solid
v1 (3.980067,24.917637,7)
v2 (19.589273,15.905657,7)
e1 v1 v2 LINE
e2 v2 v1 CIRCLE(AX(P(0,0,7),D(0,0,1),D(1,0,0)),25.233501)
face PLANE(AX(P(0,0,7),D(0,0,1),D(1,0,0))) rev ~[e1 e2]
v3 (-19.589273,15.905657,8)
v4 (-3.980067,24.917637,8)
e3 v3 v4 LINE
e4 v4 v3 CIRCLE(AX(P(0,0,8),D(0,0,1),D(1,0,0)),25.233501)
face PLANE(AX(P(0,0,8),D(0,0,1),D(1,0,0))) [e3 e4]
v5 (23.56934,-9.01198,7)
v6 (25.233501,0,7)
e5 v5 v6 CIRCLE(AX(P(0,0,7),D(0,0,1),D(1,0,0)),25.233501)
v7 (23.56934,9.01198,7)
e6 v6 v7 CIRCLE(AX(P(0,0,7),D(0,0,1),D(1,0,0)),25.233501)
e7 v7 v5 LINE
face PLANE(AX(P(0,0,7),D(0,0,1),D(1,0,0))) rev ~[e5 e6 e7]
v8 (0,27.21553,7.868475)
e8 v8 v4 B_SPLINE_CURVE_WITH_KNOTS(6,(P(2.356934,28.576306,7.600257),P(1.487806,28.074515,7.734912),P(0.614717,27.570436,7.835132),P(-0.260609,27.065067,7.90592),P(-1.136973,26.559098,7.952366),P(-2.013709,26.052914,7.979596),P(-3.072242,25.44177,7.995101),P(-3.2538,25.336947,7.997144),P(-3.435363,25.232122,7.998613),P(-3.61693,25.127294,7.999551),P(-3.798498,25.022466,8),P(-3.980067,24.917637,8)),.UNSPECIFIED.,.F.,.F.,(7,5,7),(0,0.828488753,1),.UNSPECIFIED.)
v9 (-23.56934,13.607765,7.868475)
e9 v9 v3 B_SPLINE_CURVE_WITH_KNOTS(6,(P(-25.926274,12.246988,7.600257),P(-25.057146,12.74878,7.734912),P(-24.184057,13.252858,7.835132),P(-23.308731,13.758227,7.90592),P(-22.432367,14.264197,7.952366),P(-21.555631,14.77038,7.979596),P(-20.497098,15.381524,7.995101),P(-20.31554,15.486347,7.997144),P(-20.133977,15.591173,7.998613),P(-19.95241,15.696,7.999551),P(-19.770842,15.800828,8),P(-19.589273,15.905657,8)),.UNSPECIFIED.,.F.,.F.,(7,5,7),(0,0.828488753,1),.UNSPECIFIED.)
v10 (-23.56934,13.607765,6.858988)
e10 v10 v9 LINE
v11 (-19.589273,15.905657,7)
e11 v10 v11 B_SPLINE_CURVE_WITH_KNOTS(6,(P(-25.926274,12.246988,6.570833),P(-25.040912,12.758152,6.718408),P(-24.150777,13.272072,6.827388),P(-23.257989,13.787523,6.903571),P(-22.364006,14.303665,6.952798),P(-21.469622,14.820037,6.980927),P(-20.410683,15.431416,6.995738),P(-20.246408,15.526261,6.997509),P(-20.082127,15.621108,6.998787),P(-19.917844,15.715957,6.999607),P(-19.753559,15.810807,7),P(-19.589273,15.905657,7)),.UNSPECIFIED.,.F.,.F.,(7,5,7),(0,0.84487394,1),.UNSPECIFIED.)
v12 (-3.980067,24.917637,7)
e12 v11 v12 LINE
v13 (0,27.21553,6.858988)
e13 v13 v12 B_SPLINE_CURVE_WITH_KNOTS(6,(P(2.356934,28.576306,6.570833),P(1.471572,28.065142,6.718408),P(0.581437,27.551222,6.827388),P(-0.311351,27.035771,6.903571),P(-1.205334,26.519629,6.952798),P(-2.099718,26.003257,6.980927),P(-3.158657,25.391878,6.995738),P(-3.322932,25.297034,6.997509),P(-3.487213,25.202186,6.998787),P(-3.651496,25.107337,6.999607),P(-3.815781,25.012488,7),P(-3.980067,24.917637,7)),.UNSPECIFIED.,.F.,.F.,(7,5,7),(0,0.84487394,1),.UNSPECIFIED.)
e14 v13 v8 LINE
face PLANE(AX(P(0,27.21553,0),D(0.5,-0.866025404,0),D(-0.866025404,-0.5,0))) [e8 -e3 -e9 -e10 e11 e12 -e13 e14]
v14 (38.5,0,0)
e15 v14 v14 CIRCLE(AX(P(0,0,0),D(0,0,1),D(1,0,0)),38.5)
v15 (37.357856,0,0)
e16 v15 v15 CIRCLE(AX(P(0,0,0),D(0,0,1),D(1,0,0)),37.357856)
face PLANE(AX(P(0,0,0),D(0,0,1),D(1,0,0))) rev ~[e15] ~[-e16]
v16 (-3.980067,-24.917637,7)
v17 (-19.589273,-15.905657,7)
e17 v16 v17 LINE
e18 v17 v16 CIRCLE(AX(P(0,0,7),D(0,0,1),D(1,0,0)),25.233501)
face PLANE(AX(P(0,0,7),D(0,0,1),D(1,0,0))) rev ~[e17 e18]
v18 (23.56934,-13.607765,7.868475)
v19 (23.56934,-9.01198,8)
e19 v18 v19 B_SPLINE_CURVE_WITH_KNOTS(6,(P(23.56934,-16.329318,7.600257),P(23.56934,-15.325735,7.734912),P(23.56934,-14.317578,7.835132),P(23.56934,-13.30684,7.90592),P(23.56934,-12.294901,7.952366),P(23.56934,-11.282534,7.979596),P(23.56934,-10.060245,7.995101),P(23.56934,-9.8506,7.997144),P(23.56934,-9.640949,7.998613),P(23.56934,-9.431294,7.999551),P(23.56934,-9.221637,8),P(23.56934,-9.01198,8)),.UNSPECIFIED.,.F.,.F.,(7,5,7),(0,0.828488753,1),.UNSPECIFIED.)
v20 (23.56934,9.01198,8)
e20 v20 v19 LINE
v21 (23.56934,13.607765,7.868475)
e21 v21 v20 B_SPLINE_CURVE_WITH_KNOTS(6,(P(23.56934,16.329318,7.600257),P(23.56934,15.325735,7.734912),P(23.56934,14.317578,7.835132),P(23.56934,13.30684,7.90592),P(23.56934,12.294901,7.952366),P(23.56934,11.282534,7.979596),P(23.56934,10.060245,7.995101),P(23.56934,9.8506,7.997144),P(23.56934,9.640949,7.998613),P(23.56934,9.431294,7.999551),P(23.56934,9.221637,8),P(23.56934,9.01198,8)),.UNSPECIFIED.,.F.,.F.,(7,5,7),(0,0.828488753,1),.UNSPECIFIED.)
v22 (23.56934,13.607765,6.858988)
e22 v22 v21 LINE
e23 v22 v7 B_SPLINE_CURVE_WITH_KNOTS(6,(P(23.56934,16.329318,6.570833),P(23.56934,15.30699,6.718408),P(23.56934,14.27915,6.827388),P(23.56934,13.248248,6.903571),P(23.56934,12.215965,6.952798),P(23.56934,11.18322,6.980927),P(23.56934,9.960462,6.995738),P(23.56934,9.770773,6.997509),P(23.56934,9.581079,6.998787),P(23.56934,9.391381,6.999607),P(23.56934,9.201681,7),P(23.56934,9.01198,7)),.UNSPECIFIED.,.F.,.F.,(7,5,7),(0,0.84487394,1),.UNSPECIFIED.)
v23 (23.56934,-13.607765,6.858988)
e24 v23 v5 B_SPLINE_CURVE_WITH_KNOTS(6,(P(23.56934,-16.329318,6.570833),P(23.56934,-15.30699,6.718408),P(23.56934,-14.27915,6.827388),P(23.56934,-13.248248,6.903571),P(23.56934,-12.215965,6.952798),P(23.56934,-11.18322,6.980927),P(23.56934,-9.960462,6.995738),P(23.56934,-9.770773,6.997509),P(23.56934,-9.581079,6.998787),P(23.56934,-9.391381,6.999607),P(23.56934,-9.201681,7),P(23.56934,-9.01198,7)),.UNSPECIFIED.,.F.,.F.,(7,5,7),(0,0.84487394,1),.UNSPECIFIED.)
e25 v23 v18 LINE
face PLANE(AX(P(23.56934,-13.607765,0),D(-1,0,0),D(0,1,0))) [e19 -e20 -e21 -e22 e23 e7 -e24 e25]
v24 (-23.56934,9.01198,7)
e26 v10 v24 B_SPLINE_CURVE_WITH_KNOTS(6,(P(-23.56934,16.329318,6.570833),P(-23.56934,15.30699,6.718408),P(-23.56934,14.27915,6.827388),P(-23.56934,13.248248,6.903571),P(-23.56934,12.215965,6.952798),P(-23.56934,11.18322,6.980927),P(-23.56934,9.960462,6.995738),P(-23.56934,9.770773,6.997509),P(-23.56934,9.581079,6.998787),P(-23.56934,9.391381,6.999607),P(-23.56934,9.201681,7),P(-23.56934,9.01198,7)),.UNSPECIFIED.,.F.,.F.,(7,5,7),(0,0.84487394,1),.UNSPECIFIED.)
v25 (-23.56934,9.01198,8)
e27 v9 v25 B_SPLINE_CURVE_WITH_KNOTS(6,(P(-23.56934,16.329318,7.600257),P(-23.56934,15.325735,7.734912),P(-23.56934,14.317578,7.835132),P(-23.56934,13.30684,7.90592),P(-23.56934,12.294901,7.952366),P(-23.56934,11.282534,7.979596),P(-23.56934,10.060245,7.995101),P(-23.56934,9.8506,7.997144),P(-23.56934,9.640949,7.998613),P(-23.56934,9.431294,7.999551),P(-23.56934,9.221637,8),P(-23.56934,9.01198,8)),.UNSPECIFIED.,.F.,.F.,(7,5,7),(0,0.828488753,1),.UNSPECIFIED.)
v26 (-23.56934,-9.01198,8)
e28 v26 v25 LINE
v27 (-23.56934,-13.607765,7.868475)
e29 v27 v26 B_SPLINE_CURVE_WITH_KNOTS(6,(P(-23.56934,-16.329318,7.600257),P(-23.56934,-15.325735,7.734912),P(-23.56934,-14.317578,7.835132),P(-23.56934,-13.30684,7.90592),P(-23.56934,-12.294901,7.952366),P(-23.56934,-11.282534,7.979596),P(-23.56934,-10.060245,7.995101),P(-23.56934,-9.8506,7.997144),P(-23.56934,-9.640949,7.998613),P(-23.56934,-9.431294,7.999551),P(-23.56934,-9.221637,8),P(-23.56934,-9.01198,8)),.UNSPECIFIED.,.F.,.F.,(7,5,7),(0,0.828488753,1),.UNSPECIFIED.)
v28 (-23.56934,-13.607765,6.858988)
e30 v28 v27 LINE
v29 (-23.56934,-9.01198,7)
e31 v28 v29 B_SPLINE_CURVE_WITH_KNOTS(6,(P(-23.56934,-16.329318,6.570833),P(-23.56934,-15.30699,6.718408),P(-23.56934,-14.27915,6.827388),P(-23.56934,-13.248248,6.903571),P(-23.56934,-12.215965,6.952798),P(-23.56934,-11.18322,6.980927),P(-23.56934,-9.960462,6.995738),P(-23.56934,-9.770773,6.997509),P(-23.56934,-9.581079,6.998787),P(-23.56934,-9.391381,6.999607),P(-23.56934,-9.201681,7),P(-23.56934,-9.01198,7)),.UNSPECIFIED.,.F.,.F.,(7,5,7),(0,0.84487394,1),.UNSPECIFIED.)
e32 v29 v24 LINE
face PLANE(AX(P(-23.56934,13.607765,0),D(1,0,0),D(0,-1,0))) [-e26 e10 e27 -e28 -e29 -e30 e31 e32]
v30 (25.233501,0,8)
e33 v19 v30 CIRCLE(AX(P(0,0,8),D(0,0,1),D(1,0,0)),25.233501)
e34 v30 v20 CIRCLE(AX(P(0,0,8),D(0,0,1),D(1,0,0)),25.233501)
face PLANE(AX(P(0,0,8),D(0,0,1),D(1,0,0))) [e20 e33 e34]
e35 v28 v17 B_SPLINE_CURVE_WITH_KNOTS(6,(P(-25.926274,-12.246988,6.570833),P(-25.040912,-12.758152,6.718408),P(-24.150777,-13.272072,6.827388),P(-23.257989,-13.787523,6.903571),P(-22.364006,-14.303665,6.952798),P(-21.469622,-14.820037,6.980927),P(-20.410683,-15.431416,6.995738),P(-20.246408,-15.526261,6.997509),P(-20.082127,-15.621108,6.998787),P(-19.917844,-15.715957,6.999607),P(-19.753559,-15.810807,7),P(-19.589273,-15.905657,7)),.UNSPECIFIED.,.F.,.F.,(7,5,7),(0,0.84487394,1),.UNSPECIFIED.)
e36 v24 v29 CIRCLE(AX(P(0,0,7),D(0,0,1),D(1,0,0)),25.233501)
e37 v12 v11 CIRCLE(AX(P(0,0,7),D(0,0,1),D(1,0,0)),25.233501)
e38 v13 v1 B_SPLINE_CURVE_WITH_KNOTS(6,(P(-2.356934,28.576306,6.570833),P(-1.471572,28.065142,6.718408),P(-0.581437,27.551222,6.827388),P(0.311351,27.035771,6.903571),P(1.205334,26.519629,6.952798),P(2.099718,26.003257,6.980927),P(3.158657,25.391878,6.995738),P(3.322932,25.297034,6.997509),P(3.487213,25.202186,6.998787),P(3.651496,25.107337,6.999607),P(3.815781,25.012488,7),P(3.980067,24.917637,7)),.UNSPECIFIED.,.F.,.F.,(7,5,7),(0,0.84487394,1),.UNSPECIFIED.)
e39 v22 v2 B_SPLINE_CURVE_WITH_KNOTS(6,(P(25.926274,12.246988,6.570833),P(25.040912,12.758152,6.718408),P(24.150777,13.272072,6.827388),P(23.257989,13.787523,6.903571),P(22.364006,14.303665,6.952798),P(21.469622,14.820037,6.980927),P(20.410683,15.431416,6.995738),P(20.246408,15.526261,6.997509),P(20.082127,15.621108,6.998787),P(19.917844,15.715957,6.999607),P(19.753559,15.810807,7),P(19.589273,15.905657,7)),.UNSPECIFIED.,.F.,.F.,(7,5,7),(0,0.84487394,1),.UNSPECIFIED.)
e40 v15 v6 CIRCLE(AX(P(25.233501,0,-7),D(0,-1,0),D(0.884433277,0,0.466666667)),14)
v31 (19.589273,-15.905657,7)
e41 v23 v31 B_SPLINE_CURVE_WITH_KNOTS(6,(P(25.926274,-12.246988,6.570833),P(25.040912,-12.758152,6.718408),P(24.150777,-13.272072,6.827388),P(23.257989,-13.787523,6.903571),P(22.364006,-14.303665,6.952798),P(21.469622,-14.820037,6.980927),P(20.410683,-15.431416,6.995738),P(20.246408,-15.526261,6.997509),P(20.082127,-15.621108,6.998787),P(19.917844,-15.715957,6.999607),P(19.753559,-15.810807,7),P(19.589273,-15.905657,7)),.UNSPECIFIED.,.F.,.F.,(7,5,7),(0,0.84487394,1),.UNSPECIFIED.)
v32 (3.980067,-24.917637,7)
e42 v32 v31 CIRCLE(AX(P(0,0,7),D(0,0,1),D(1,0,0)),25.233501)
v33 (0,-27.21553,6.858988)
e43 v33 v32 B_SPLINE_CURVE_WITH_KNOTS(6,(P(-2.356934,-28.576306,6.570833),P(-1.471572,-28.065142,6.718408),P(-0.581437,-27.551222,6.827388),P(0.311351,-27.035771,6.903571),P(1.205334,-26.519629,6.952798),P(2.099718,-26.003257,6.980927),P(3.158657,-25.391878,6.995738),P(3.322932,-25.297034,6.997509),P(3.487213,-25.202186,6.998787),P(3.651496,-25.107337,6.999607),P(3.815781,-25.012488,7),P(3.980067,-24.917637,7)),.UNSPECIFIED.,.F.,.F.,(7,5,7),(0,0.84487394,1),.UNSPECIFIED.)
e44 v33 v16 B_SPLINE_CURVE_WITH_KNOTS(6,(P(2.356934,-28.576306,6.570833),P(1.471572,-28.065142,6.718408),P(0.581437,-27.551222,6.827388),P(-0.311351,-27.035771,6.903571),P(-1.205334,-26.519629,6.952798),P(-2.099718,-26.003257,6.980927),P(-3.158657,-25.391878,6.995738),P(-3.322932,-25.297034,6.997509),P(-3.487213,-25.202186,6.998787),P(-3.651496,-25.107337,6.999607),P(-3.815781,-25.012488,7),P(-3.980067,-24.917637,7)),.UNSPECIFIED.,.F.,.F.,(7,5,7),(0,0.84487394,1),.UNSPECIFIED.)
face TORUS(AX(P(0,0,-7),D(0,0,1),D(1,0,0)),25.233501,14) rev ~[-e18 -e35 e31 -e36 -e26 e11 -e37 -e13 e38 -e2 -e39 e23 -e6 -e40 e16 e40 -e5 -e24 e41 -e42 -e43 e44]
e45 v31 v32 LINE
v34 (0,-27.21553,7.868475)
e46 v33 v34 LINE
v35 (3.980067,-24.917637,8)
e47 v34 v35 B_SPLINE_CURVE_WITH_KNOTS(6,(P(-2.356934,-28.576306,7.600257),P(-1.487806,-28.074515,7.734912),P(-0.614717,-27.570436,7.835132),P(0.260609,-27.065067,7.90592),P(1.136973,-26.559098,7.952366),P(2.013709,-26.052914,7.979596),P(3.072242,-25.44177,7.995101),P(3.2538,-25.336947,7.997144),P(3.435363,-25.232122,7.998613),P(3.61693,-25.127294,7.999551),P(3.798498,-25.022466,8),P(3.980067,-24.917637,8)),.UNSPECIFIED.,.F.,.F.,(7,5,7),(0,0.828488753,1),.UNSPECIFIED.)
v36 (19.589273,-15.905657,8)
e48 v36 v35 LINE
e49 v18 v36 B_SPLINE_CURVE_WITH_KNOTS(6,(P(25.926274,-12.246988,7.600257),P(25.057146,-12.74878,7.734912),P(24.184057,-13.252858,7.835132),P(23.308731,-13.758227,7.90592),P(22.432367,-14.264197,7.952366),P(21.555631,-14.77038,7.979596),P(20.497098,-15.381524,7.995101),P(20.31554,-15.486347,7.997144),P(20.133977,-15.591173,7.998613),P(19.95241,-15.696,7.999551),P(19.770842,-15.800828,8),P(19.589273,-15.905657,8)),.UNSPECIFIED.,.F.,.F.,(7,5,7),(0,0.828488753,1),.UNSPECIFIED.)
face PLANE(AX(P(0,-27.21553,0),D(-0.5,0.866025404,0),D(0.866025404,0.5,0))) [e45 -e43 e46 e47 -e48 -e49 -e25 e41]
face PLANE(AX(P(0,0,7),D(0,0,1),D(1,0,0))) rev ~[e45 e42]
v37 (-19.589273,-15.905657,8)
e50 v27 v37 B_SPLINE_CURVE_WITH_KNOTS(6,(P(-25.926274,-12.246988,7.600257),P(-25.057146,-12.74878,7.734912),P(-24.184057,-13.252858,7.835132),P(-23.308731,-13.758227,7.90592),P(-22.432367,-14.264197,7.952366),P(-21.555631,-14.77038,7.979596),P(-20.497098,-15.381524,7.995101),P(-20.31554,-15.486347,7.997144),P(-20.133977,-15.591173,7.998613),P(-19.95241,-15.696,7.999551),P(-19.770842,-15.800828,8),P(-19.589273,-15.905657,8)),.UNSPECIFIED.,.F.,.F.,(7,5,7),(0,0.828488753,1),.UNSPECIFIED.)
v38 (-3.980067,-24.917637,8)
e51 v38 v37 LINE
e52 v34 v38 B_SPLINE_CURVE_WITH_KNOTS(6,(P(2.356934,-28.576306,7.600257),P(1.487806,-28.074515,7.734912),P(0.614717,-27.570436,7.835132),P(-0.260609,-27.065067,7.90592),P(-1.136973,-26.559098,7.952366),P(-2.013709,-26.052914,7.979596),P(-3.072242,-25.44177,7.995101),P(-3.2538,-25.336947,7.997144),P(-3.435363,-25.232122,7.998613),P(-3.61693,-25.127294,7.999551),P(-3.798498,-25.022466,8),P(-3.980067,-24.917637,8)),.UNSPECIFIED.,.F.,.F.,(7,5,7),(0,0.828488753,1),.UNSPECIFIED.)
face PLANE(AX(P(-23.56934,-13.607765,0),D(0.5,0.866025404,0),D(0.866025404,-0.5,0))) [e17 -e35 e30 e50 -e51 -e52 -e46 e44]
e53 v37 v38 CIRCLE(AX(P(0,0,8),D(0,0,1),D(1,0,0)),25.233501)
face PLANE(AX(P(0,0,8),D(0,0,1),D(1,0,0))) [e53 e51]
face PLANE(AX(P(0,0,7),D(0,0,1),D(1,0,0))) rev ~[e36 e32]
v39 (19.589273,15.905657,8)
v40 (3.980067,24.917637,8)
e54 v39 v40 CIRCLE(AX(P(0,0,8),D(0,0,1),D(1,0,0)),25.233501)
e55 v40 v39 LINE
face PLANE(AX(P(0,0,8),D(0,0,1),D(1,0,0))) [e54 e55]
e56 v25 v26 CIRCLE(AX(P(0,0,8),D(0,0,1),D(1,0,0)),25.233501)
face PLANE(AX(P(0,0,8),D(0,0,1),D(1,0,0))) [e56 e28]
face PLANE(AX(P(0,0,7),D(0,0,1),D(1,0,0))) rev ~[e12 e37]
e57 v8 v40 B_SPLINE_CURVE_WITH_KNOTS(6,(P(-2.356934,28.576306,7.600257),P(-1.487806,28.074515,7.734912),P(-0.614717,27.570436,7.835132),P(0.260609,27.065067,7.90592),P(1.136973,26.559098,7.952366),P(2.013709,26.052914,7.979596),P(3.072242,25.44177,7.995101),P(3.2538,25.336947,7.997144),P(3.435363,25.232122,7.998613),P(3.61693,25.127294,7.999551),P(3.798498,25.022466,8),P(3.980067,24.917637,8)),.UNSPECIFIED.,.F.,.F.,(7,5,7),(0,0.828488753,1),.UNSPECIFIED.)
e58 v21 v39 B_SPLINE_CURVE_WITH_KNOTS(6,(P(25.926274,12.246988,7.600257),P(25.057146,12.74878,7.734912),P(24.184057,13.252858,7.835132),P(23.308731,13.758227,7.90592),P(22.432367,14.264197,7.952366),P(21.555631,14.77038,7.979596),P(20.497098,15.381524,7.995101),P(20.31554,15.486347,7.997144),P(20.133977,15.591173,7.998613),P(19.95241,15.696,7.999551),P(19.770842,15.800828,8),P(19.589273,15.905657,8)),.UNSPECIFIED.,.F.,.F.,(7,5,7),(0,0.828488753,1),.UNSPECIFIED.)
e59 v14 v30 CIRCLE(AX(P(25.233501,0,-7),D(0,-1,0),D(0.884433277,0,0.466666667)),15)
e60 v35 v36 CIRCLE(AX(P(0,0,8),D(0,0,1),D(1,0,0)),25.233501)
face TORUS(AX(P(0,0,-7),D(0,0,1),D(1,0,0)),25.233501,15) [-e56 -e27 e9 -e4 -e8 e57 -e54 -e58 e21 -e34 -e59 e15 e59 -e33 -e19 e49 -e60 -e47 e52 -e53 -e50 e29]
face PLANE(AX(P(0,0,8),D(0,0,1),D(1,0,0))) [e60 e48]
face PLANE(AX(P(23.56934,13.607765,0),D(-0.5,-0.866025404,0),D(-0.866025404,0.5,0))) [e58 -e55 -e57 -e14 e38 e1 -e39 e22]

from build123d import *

# Parameters (mm, degrees)
F0_R     = 38.5
F1_DEPTH = 8
F4_DEPTH = 8
F5_T     = -1
F7_DEPTH = 25


# Not quite as in the source:
# - a fillet or chamfer that OpenCascade refuses, or shapes differently, is made with other operations: its cross-section is extruded or revolved along the edge and cut away or added


with BuildPart() as f1:
    # F0 (on Top) → F1 (new body)
    with BuildSketch(Plane.XY):
        Circle(F0_R)
    extrude(amount=F1_DEPTH)

    # F3: fillet of radius 15 on 1 edges, made by hand

    # F3_s1 → F3_t2 (revolve, cut)
    with BuildSketch(Plane.XZ):
        with BuildLine():
            ThreePointArc((38.5, 0), (32.979467531, 5.8452325787), (25.2335008386, 8))
            Line((25.2335008386, 8), (25.2335008386, 8.3))
            Line((25.2335008386, 8.3), (38.5, 8.3))
            Line((38.5, 8.3), (38.8, 8))
            ThreePointArc((38.8, 8), (38.8, 4), (38.7653299832, 0.14))
            Line((38.7653299832, 0.14), (38.5, 0))
        make_face()
    revolve(axis=Axis((0, 0, 8), (0, 0, 1)), mode=Mode.SUBTRACT)

    # F2 (on face) → F4 (cut)
    with BuildSketch(Plane.XY.offset(8)):
        Polygon((-0.0532552026, 25.9807075324), (-22.5265803327, 12.9442334078), (-22.47332513, -13.0364741246), (0.0532552026, -25.9807075324), (22.5265803327, -12.9442334078), (22.47332513, 13.0364741246), align=None)
    extrude(amount=-F4_DEPTH, mode=Mode.SUBTRACT)

    # F5
    f5_openings = [f1.faces().sort_by_distance(p)[0] for p in [
        (-37.411056, 0, 0),
    ]]
    offset(amount=F5_T, openings=f5_openings)

    # F6 (on Top) → F7 (cut)
    with BuildSketch(Plane.XY):
        Polygon((-23.56934, 13.6077647936), (-23.56934, -13.6077647936), (0, -27.2155295872), (23.56934, -13.6077647936), (23.56934, 13.6077647936), (0, 27.2155295872), align=None)
    extrude(amount=F7_DEPTH, mode=Mode.SUBTRACT)


solid = f1.part
